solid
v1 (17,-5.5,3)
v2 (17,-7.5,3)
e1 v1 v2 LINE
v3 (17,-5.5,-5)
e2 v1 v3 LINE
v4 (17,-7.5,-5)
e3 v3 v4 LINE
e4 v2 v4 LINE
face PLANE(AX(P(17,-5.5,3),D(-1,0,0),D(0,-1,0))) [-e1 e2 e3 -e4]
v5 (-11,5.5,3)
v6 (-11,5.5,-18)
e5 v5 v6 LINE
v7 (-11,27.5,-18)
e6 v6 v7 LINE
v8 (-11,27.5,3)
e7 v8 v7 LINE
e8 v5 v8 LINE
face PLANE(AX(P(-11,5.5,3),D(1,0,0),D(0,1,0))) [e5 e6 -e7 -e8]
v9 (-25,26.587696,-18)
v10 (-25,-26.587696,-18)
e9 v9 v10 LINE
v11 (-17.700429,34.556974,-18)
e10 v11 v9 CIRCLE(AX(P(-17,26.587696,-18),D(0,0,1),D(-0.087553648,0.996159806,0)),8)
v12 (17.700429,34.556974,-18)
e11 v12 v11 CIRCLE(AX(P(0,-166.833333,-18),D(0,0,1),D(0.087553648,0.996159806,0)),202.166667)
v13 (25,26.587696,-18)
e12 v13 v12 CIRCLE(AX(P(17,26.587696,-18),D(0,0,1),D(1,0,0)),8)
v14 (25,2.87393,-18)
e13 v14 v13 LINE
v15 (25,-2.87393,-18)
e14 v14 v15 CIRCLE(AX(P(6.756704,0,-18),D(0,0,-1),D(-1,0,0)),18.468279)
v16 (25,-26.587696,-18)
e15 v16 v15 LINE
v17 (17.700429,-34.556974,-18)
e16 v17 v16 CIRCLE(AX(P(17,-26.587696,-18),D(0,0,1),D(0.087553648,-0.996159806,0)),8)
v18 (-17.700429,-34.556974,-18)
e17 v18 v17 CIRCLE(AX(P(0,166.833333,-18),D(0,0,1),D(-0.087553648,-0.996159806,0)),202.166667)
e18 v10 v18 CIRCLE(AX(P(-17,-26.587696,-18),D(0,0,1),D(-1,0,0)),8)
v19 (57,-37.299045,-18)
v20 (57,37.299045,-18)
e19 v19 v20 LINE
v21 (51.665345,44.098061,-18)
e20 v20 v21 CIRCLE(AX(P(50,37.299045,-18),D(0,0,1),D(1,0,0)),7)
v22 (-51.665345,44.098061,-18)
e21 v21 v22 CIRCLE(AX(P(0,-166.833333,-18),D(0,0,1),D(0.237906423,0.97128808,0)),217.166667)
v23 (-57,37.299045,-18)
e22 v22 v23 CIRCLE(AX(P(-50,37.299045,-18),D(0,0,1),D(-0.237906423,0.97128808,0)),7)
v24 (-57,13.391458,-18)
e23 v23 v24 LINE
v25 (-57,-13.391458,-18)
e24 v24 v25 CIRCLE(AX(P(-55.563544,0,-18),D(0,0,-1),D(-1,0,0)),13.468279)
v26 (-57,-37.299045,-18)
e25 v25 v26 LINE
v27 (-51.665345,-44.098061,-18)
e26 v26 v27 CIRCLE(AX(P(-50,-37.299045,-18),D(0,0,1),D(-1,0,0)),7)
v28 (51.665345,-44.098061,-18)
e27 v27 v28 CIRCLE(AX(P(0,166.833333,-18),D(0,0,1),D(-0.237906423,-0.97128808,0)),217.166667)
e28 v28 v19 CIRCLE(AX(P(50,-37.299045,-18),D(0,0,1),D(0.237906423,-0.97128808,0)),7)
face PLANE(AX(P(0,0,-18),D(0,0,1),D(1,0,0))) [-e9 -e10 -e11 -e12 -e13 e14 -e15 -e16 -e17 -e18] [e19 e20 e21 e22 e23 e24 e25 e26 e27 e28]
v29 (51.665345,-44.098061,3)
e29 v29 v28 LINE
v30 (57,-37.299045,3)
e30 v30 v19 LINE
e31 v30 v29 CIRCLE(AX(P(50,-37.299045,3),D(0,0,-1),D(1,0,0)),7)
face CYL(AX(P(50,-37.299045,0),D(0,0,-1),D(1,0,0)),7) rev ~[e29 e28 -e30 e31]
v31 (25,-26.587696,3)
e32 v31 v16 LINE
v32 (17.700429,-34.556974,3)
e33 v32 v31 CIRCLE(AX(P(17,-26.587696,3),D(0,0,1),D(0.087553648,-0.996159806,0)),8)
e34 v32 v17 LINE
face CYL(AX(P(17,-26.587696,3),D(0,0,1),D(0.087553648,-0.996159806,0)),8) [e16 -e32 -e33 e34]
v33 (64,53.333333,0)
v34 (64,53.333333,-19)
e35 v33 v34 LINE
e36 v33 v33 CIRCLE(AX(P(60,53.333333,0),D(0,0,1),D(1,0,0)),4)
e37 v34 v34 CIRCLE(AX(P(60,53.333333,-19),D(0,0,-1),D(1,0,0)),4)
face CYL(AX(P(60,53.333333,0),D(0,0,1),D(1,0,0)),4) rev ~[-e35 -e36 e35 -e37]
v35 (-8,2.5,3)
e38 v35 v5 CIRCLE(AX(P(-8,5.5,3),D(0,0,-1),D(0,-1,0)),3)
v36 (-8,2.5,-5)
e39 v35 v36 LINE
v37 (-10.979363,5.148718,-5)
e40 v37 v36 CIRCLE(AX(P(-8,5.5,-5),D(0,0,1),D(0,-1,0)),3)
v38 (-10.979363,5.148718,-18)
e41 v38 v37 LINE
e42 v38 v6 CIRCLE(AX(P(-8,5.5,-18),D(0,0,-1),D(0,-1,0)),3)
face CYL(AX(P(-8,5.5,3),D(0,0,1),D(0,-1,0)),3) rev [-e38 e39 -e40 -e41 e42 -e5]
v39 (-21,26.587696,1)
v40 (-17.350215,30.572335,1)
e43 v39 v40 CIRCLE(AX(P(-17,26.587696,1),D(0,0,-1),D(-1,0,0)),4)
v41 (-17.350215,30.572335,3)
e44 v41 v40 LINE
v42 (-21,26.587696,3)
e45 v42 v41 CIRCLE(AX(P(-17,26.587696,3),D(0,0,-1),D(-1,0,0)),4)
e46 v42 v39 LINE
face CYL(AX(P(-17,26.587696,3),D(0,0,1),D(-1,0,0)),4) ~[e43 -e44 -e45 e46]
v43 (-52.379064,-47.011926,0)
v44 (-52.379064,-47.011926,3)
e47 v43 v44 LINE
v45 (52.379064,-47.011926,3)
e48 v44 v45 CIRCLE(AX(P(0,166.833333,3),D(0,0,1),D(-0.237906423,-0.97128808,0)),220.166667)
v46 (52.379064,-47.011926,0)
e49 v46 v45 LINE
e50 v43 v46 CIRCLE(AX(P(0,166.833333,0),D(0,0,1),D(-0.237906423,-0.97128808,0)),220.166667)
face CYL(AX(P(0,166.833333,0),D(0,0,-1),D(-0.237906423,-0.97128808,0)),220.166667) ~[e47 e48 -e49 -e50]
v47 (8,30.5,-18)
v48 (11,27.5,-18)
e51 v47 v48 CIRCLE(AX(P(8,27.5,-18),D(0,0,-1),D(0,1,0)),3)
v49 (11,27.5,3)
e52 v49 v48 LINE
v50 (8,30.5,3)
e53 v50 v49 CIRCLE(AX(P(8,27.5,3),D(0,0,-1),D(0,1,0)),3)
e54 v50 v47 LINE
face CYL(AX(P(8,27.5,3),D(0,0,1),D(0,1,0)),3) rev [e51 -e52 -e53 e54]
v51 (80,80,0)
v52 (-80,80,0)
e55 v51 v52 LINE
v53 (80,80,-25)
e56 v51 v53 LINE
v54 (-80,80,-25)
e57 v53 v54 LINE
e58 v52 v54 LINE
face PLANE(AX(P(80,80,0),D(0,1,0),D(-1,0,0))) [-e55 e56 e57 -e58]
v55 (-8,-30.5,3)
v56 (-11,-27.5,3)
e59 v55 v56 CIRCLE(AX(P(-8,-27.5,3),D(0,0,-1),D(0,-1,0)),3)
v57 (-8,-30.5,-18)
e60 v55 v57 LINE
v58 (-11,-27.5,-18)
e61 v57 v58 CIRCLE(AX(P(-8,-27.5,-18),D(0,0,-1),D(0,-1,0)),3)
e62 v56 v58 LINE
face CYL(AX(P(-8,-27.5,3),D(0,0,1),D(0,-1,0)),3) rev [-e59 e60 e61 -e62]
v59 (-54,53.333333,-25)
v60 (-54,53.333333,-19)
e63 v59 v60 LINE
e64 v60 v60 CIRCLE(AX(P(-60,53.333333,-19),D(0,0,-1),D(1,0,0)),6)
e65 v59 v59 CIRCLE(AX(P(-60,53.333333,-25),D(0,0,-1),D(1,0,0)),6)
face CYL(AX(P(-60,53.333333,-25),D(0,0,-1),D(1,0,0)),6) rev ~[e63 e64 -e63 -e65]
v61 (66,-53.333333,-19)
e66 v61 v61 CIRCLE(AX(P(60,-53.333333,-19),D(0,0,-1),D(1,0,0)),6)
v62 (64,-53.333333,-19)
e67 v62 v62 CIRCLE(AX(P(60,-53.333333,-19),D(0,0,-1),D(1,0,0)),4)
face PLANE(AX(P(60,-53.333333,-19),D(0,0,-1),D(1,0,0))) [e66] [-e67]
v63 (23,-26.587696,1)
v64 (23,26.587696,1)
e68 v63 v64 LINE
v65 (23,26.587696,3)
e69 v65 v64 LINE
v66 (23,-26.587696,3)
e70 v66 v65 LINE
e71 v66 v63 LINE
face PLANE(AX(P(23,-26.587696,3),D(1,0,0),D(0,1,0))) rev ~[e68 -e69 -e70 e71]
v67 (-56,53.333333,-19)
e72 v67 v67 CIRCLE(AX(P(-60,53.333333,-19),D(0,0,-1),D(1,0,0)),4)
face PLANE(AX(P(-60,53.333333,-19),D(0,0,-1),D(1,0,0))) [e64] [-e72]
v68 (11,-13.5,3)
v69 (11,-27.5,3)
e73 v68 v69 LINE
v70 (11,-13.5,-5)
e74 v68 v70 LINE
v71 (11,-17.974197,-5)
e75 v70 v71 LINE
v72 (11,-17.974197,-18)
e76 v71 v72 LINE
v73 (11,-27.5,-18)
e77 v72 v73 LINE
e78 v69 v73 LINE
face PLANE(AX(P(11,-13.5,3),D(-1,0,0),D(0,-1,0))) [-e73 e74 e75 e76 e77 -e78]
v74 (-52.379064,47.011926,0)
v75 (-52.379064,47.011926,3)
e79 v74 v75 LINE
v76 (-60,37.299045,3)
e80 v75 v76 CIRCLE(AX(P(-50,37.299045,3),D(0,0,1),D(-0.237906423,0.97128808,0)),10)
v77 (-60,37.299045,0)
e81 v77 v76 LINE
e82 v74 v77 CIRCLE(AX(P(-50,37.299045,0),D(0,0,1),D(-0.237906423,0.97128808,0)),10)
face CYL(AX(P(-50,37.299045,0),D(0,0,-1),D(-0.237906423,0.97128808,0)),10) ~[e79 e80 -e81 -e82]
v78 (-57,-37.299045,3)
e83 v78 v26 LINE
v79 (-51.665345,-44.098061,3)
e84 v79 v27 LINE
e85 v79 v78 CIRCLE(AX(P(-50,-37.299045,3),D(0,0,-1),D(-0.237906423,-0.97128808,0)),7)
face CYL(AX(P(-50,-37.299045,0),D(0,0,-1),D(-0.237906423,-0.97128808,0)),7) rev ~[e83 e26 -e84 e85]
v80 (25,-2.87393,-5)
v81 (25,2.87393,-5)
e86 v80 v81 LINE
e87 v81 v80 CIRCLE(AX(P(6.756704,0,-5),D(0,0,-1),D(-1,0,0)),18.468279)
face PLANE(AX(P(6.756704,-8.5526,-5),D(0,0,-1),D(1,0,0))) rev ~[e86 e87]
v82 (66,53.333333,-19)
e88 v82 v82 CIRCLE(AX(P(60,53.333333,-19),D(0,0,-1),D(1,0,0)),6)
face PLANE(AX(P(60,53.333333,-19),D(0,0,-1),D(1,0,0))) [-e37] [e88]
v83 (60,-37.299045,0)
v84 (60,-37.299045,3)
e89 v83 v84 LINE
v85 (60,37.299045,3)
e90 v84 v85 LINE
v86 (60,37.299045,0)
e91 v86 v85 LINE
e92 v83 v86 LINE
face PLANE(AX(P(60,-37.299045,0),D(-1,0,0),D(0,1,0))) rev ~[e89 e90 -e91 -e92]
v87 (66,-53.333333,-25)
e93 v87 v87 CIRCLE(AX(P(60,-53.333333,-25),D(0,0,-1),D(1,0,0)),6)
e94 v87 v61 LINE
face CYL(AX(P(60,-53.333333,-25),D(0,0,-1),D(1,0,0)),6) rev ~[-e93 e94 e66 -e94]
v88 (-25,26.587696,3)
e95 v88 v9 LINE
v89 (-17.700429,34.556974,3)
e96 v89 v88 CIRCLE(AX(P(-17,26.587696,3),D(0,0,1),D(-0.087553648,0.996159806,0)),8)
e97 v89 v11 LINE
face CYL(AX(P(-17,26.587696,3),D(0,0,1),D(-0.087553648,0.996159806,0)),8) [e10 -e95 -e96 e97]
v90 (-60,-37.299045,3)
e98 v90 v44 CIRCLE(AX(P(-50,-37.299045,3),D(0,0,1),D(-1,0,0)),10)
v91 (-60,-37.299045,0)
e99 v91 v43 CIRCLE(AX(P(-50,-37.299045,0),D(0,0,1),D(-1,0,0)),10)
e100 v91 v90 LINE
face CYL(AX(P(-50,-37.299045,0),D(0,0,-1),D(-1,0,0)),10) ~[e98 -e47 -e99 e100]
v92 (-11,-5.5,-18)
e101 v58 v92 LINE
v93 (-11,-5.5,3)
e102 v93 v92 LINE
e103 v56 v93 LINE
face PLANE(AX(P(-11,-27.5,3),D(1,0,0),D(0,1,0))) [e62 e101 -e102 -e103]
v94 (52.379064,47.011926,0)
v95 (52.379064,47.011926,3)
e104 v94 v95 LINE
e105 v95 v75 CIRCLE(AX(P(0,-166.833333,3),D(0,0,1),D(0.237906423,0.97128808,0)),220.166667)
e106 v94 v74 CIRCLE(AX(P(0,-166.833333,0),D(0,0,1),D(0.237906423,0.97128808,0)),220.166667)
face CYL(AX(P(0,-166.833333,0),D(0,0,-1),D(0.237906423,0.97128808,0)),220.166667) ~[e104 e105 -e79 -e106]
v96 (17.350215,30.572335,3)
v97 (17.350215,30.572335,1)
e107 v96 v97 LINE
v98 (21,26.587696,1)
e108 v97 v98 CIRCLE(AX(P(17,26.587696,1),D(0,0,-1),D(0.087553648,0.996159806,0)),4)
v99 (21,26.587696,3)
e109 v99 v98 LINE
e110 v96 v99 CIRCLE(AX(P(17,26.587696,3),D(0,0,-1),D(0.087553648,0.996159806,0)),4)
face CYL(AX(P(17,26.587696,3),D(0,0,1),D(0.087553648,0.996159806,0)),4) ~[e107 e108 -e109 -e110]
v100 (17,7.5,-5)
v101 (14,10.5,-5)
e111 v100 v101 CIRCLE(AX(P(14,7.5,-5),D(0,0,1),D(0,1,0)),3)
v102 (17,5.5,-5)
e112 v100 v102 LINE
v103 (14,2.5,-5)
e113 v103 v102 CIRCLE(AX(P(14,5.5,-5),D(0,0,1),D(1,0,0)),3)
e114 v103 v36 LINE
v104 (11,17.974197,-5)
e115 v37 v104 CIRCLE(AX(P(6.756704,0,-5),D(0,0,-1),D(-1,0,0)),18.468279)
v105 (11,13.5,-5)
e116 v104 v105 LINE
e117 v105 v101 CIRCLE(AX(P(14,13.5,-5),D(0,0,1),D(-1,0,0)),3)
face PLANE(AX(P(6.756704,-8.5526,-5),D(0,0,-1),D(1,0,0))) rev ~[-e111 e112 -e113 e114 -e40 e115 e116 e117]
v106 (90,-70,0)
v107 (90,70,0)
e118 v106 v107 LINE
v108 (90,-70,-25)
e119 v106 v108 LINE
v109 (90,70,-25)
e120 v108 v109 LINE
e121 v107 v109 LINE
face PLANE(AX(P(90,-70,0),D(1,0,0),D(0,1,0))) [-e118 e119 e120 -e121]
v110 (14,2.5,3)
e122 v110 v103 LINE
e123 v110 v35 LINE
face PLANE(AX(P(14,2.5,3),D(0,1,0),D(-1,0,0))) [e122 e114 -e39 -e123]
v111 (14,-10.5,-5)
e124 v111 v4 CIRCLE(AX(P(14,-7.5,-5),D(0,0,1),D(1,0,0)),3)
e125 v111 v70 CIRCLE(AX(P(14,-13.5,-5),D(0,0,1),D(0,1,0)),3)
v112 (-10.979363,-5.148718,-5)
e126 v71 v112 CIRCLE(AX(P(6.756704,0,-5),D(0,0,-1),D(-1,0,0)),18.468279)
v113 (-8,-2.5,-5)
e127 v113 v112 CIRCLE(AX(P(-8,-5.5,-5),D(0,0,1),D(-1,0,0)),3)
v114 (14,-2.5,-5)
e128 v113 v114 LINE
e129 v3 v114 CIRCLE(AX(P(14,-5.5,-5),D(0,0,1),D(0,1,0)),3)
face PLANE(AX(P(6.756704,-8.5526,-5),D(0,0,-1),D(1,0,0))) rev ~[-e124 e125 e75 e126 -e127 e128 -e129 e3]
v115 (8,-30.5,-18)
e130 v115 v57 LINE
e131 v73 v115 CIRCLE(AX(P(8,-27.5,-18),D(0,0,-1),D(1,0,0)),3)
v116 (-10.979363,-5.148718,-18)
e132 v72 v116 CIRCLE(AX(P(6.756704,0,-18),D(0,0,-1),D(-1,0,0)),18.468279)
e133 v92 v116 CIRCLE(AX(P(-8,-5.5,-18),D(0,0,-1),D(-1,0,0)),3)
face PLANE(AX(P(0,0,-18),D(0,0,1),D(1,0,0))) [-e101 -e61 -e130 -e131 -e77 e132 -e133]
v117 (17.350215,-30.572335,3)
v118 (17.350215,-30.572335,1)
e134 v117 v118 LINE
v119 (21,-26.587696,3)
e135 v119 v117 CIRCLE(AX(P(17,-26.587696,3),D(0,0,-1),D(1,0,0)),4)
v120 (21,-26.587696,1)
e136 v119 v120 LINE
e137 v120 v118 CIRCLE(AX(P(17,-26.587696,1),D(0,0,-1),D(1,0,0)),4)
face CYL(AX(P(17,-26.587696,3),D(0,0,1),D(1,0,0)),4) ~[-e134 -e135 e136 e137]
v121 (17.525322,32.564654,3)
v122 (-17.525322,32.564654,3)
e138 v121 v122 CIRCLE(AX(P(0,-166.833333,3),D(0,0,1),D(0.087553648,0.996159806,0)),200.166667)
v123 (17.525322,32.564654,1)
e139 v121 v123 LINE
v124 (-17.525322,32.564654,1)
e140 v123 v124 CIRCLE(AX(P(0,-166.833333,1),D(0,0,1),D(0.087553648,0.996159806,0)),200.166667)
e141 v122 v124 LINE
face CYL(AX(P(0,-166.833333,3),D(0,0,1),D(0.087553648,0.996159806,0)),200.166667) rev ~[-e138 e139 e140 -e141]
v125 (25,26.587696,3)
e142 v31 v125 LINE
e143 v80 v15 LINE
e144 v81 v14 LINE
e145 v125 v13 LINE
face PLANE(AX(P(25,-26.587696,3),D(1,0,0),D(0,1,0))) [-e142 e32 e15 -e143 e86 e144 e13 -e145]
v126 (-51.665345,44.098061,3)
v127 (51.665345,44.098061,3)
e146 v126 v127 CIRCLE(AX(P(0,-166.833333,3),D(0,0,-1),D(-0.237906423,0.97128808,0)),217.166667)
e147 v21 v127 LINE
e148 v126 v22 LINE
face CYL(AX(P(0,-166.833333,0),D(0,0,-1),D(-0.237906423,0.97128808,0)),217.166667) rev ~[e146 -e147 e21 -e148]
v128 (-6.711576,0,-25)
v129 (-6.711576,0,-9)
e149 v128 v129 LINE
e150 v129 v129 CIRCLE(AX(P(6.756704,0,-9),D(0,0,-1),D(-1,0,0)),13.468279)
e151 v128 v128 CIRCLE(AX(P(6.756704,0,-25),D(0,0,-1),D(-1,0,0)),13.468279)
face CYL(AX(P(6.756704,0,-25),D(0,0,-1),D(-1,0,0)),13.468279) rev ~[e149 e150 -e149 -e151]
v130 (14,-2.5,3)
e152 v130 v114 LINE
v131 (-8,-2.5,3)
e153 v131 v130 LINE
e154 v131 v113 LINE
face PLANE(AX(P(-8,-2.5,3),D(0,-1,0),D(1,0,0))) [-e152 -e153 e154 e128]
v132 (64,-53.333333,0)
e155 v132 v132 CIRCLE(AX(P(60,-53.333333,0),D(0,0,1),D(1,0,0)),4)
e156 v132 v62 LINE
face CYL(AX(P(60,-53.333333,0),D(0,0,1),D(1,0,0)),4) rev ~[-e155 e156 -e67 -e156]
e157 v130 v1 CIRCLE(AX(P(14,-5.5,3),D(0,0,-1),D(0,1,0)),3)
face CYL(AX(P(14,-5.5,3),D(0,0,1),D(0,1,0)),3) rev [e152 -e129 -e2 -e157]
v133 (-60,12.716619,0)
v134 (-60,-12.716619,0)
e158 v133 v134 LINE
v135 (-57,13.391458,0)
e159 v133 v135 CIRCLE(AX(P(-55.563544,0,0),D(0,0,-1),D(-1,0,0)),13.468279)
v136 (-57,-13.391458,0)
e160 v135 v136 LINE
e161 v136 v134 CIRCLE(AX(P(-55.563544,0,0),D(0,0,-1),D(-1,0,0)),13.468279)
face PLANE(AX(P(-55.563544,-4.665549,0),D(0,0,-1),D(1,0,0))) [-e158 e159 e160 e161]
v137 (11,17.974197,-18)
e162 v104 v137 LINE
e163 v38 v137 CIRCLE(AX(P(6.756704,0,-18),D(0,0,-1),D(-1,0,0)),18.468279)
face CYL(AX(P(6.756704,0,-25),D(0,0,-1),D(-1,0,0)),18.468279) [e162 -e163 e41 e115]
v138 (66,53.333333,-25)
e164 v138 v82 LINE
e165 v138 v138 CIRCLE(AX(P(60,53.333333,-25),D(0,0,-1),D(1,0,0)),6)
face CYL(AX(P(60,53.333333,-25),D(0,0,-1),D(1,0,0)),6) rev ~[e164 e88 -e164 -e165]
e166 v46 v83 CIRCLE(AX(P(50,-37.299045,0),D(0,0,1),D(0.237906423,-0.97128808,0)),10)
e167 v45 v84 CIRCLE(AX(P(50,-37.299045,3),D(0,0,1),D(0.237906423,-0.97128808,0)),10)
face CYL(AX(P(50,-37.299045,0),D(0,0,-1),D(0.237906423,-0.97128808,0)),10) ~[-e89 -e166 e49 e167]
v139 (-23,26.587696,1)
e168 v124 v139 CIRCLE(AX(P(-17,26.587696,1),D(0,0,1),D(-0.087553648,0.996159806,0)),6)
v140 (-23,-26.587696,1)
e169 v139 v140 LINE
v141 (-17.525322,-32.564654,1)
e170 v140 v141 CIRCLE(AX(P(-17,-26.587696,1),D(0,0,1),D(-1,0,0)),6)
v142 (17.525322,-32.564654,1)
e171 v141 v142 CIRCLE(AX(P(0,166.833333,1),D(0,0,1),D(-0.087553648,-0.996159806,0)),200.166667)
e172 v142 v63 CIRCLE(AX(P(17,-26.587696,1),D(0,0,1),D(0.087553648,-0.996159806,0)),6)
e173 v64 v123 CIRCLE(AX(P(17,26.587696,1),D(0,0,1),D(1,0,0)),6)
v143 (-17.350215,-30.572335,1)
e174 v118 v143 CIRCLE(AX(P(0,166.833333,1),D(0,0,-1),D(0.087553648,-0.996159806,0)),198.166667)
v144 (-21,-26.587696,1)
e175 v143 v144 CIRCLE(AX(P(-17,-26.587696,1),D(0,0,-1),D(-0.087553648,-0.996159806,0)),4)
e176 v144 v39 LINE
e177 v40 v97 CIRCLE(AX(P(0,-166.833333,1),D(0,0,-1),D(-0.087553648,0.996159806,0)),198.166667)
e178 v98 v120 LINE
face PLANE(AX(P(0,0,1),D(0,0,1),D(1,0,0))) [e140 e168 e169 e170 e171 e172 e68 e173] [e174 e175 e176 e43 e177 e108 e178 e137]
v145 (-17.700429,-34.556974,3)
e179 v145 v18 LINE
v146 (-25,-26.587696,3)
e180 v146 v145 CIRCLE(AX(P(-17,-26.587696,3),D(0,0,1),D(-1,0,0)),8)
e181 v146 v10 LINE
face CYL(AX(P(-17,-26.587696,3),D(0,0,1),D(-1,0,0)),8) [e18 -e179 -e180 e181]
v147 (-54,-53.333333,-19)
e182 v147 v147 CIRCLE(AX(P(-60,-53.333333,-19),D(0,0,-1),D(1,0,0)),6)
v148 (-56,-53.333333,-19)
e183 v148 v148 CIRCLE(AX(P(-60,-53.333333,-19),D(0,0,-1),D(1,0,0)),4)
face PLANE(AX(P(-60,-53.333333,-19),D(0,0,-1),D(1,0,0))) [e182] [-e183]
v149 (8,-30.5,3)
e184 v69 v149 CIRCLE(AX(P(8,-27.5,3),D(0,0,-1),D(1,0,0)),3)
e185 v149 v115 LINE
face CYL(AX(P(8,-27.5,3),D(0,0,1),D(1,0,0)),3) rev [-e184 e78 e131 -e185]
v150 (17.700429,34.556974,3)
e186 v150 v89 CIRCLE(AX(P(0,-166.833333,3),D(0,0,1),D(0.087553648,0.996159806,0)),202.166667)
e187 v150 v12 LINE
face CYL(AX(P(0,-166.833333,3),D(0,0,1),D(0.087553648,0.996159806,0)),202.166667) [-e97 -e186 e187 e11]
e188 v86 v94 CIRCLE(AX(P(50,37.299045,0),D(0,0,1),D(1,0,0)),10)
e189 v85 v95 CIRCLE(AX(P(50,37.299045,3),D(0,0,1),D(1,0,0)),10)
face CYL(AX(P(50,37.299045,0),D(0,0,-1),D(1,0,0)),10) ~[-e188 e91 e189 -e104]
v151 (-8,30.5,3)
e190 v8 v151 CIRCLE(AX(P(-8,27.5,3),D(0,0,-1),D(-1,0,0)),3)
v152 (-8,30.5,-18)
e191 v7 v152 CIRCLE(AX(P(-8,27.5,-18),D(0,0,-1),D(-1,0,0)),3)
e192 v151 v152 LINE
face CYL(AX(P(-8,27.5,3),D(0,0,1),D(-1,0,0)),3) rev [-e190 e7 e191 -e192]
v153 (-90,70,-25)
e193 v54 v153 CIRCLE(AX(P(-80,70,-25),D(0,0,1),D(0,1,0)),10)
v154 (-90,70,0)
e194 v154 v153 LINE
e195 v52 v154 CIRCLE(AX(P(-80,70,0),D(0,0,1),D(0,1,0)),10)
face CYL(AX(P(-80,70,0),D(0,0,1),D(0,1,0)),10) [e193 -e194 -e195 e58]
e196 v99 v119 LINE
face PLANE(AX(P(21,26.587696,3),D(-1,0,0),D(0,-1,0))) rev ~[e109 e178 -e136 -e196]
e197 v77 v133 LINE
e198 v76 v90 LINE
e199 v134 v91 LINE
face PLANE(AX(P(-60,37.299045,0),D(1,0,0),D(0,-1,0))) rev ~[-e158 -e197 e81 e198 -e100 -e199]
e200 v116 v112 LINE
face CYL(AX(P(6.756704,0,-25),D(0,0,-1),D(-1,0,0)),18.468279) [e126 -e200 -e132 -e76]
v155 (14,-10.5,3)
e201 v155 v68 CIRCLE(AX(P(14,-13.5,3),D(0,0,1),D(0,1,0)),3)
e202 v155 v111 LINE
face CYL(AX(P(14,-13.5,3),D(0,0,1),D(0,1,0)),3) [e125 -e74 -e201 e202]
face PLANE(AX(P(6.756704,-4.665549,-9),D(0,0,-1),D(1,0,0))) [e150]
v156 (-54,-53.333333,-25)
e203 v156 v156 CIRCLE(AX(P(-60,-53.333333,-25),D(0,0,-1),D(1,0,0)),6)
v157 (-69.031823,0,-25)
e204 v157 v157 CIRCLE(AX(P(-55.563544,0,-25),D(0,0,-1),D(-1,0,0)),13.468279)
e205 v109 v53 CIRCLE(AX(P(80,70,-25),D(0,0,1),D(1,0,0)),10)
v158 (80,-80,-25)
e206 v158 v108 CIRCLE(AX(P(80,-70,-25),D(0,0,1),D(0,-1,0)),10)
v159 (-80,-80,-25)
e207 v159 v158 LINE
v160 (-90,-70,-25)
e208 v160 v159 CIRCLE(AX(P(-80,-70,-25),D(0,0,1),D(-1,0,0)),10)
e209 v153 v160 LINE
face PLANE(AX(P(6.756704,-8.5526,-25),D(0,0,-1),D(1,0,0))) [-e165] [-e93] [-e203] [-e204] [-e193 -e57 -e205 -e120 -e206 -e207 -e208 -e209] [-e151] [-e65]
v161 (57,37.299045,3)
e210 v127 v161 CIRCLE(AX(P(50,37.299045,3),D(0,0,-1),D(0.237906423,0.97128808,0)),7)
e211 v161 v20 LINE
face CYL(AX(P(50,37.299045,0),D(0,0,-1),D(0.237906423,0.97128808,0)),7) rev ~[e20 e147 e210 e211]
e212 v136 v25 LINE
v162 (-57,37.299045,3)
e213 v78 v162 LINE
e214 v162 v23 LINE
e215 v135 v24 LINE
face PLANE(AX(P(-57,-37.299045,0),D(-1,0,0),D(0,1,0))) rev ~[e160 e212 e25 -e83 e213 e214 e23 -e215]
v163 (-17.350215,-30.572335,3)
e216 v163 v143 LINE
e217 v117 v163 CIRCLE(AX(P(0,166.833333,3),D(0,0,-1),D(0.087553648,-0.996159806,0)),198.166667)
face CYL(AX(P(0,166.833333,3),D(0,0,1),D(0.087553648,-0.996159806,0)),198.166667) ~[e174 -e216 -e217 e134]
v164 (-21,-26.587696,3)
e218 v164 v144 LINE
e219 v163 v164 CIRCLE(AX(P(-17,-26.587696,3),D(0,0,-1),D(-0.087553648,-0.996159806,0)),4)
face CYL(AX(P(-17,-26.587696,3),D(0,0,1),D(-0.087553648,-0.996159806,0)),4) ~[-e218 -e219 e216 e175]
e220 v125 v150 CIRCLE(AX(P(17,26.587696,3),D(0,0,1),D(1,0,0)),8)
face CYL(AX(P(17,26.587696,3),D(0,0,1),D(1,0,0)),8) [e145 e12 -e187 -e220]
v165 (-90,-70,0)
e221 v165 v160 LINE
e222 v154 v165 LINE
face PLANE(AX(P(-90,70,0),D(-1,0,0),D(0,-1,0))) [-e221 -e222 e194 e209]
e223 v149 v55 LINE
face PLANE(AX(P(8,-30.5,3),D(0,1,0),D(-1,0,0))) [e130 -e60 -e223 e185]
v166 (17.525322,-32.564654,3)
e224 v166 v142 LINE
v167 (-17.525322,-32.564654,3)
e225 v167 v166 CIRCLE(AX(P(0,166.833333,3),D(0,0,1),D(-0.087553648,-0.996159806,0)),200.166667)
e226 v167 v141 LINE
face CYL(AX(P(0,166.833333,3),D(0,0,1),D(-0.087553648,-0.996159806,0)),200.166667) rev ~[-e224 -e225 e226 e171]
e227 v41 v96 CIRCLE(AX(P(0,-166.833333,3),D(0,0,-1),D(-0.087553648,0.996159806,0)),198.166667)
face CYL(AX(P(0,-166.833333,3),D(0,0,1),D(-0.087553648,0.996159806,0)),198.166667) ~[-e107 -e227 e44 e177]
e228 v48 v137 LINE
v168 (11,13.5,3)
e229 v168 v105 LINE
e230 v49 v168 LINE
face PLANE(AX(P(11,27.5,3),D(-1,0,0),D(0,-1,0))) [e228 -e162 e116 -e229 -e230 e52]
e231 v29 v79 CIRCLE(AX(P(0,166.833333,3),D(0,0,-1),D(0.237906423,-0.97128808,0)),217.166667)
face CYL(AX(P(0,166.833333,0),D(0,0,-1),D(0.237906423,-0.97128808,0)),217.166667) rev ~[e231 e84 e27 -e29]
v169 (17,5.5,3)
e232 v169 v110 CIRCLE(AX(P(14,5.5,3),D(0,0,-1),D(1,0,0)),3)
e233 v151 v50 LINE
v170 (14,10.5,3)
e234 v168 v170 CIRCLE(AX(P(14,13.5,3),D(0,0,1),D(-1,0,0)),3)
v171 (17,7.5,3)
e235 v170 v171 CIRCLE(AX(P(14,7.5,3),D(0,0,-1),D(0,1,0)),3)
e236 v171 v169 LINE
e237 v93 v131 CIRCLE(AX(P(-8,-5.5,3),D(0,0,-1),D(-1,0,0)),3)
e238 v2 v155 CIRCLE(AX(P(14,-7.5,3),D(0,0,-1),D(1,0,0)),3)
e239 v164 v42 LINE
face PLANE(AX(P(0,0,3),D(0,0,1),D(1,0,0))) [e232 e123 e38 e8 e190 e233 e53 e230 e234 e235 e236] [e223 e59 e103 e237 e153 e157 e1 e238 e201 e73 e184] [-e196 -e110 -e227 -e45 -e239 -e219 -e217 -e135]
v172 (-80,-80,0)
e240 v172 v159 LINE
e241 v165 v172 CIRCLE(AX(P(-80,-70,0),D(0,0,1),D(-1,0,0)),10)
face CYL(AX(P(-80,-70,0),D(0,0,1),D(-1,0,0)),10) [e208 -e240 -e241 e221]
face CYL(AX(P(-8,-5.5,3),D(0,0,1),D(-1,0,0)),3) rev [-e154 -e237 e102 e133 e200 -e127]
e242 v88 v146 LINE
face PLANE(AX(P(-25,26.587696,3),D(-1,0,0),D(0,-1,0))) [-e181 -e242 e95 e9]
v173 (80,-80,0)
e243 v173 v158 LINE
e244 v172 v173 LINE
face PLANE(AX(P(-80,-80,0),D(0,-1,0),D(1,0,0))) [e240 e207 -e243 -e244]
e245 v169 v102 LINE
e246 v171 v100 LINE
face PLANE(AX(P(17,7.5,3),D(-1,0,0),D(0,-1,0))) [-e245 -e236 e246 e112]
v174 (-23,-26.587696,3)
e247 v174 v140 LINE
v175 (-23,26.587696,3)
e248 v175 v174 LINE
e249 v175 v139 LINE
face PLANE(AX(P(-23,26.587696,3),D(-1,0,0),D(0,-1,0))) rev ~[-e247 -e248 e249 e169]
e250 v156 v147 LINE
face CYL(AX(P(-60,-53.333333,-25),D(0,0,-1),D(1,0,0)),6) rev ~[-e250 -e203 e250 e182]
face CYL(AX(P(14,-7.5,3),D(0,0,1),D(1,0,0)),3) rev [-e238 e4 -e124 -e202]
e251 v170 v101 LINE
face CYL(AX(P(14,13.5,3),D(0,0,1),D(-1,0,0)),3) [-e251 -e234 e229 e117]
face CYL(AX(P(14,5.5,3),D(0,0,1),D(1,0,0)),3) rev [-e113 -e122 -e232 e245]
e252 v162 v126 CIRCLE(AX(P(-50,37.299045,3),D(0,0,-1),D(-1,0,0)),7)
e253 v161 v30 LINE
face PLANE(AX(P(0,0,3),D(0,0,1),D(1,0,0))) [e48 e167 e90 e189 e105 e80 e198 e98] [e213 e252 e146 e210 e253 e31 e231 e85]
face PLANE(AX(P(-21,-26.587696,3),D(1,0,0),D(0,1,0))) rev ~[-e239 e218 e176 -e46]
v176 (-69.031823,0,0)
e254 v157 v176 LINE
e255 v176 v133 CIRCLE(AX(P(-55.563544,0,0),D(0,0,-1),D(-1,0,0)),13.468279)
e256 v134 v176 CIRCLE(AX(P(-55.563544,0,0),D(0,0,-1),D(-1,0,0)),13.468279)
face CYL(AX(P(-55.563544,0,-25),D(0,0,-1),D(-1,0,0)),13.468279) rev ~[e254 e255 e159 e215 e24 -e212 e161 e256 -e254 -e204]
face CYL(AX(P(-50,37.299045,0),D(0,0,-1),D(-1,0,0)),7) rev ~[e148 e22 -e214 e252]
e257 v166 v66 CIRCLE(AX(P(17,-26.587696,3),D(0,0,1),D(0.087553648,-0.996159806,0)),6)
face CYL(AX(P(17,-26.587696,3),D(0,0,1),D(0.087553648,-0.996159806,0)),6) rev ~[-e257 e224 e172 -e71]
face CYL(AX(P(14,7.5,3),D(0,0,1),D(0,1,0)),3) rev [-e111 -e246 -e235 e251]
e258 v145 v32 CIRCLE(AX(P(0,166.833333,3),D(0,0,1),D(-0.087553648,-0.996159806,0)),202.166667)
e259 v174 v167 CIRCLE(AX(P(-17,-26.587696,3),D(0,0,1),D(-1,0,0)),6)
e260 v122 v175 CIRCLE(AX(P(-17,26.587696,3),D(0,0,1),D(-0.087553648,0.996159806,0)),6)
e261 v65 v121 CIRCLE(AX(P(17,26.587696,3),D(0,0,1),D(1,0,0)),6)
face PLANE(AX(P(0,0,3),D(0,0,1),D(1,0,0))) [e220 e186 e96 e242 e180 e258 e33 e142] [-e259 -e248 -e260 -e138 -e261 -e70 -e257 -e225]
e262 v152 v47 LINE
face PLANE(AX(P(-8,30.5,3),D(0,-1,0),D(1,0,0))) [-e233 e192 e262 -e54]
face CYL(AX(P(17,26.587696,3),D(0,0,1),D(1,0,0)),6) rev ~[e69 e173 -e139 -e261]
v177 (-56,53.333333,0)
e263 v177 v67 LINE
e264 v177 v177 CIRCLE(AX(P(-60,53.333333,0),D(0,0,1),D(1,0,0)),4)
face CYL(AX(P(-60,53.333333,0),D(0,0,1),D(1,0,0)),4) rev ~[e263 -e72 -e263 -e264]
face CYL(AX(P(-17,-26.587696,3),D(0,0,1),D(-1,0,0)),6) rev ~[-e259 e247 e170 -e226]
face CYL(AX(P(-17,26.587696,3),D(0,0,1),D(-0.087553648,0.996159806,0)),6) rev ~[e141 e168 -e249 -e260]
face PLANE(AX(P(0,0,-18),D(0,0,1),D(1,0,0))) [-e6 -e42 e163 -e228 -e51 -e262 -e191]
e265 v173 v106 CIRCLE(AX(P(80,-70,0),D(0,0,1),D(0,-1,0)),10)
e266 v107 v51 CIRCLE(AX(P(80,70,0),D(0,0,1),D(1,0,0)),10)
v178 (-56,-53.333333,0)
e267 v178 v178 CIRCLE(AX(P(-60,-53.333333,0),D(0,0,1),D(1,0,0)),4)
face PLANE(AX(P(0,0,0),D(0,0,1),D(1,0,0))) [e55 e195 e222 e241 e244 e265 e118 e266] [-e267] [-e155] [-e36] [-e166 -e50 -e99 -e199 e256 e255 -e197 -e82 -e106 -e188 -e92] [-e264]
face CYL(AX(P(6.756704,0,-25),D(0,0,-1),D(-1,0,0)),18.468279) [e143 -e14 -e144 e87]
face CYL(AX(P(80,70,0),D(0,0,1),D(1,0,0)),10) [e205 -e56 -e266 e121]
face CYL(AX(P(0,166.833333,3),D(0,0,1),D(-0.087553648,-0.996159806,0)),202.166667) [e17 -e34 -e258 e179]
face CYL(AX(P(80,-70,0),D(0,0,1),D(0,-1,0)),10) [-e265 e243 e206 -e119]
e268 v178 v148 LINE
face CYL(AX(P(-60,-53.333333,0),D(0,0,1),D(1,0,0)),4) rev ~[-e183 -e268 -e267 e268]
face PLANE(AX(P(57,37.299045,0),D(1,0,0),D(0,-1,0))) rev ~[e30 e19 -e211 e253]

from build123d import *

# Parameters (mm, degrees)
F0_R      = 4
F1_DEPTH  = 25
F2_DEPTH  = 3
F3_DEPTH  = 18
F5_DEPTH  = 21
F6_DEPTH  = 2
F8_DEPTH  = 20
F9_DEPTH  = 16
F10_DEPTH = 25
F7_R      = 6
F7_R_2    = 4
F11_DEPTH = 6


# Not quite as in the source:
# - a feature of the source that left no trace in its solid (it failed there, or was rolled back) is left out


with BuildPart() as f1:
    # F0 (on Top) → F1 (new body)
    with BuildSketch(Plane.XY):
        with BuildLine():
            ThreePointArc((-90, -70), (-87.0710678119, -77.0710678119), (-80, -80))
            Line((-80, -80), (80, -80))
            ThreePointArc((80, -80), (87.0710678119, -77.0710678119), (90, -70))
            Line((90, -70), (90, 70))
            ThreePointArc((90, 70), (87.0710678119, 77.0710678119), (80, 80))
            Line((80, 80), (-80, 80))
            ThreePointArc((-80, 80), (-87.0710678119, 77.0710678119), (-90, 70))
            Line((-90, 70), (-90, -70))
        make_face()
        with Locations((-60, -53.3333333333)):
            Circle(F0_R, mode=Mode.SUBTRACT)
        with Locations((60, -53.3333333333)):
            Circle(F0_R, mode=Mode.SUBTRACT)
        with Locations((-60, 53.3333333333)):
            Circle(F0_R, mode=Mode.SUBTRACT)
        with BuildLine():
            ThreePointArc((-64, 37.2990447398), (-61.0143011354, 45.9411029726), (-53.3306899286, 50.8970778549))
            ThreePointArc((-53.3306899286, 50.8970778549), (0, 57.3333333333), (53.3306899286, 50.8970778549))
            ThreePointArc((53.3306899286, 50.8970778549), (61.0143011354, 45.9411029726), (64, 37.2990447398))
            Line((64, 37.2990447398), (64, -37.2990447398))
            ThreePointArc((64, -37.2990447398), (61.0143011354, -45.9411029726), (53.3306899286, -50.8970778549))
            ThreePointArc((53.3306899286, -50.8970778549), (0, -57.3333333333), (-53.3306899286, -50.8970778549))
            ThreePointArc((-53.3306899286, -50.8970778549), (-61.0143011354, -45.9411029726), (-64, -37.2990447398))
            Line((-64, -37.2990447398), (-64, 37.2990447398))
        make_face(mode=Mode.SUBTRACT)
        with Locations((60, 53.3333333333)):
            Circle(F0_R, mode=Mode.SUBTRACT)
        with BuildLine():
            ThreePointArc((53.3306899286, 50.8970778549), (0, 57.3333333333), (-53.3306899286, 50.8970778549))
            ThreePointArc((-53.3306899286, 50.8970778549), (-61.0143011354, 45.9411029726), (-64, 37.2990447398))
            Line((-64, 37.2990447398), (-64, -37.2990447398))
            ThreePointArc((-64, -37.2990447398), (-61.0143011354, -45.9411029726), (-53.3306899286, -50.8970778549))
            ThreePointArc((-53.3306899286, -50.8970778549), (0, -57.3333333333), (53.3306899286, -50.8970778549))
            ThreePointArc((53.3306899286, -50.8970778549), (61.0143011354, -45.9411029726), (64, -37.2990447398))
            Line((64, -37.2990447398), (64, 37.2990447398))
            ThreePointArc((64, 37.2990447398), (61.0143011354, 45.9411029726), (53.3306899286, 50.8970778549))
        make_face()
        with BuildLine():
            Line((-60, -37.2990447398), (-60, 37.2990447398))
            ThreePointArc((-60, 37.2990447398), (-57.8673579538, 43.4719434775), (-52.3790642347, 47.0119255363))
            ThreePointArc((-52.3790642347, 47.0119255363), (0, 53.3333333333), (52.3790642347, 47.0119255363))
            ThreePointArc((52.3790642347, 47.0119255363), (57.8673579538, 43.4719434775), (60, 37.2990447398))
            Line((60, 37.2990447398), (60, -37.2990447398))
            ThreePointArc((60, -37.2990447398), (57.8673579538, -43.4719434775), (52.3790642347, -47.0119255363))
            ThreePointArc((52.3790642347, -47.0119255363), (0, -53.3333333333), (-52.3790642347, -47.0119255363))
            ThreePointArc((-52.3790642347, -47.0119255363), (-57.8673579538, -43.4719434775), (-60, -37.2990447398))
        make_face(mode=Mode.SUBTRACT)
        with BuildLine():
            ThreePointArc((-52.3790642347, 47.0119255363), (-57.8673579538, 43.4719434775), (-60, 37.2990447398))
            Line((-60, 37.2990447398), (-60, -37.2990447398))
            ThreePointArc((-60, -37.2990447398), (-57.8673579538, -43.4719434775), (-52.3790642347, -47.0119255363))
            ThreePointArc((-52.3790642347, -47.0119255363), (0, -53.3333333333), (52.3790642347, -47.0119255363))
            ThreePointArc((52.3790642347, -47.0119255363), (57.8673579538, -43.4719434775), (60, -37.2990447398))
            Line((60, -37.2990447398), (60, 37.2990447398))
            ThreePointArc((60, 37.2990447398), (57.8673579538, 43.4719434775), (52.3790642347, 47.0119255363))
            ThreePointArc((52.3790642347, 47.0119255363), (0, 53.3333333333), (-52.3790642347, 47.0119255363))
        make_face()
        with BuildLine():
            ThreePointArc((51.6653449643, 44.0980612973), (55.5071505677, 41.6200738562), (57, 37.2990447398))
            Line((57, 37.2990447398), (57, -37.2990447398))
            ThreePointArc((57, -37.2990447398), (55.5071505677, -41.6200738562), (51.6653449643, -44.0980612973))
            ThreePointArc((51.6653449643, -44.0980612973), (0, -50.3333333333), (-51.6653449643, -44.0980612973))
            ThreePointArc((-51.6653449643, -44.0980612973), (-55.5071505677, -41.6200738562), (-57, -37.2990447398))
            Line((-57, -37.2990447398), (-57, 37.2990447398))
            ThreePointArc((-57, 37.2990447398), (-55.5071505677, 41.6200738562), (-51.6653449643, 44.0980612973))
            ThreePointArc((-51.6653449643, 44.0980612973), (0, 50.3333333333), (51.6653449643, 44.0980612973))
        make_face(mode=Mode.SUBTRACT)
        with BuildLine():
            Line((57, -37.2990447398), (57, 37.2990447398))
            ThreePointArc((57, 37.2990447398), (55.5071505677, 41.6200738562), (51.6653449643, 44.0980612973))
            ThreePointArc((51.6653449643, 44.0980612973), (0, 50.3333333333), (-51.6653449643, 44.0980612973))
            ThreePointArc((-51.6653449643, 44.0980612973), (-55.5071505677, 41.6200738562), (-57, 37.2990447398))
            Line((-57, 37.2990447398), (-57, -37.2990447398))
            ThreePointArc((-57, -37.2990447398), (-55.5071505677, -41.6200738562), (-51.6653449643, -44.0980612973))
            ThreePointArc((-51.6653449643, -44.0980612973), (0, -50.3333333333), (51.6653449643, -44.0980612973))
            ThreePointArc((51.6653449643, -44.0980612973), (55.5071505677, -41.6200738562), (57, -37.2990447398))
        make_face()
    extrude(amount=-F1_DEPTH)

    # F0 (on Top) → F2 (join)
    with BuildSketch(Plane.XY):
        with BuildLine():
            ThreePointArc((-52.3790642347, 47.0119255363), (-57.8673579538, 43.4719434775), (-60, 37.2990447398))
            Line((-60, 37.2990447398), (-60, -37.2990447398))
            ThreePointArc((-60, -37.2990447398), (-57.8673579538, -43.4719434775), (-52.3790642347, -47.0119255363))
            ThreePointArc((-52.3790642347, -47.0119255363), (0, -53.3333333333), (52.3790642347, -47.0119255363))
            ThreePointArc((52.3790642347, -47.0119255363), (57.8673579538, -43.4719434775), (60, -37.2990447398))
            Line((60, -37.2990447398), (60, 37.2990447398))
            ThreePointArc((60, 37.2990447398), (57.8673579538, 43.4719434775), (52.3790642347, 47.0119255363))
            ThreePointArc((52.3790642347, 47.0119255363), (0, 53.3333333333), (-52.3790642347, 47.0119255363))
        make_face()
        with BuildLine():
            ThreePointArc((51.6653449643, 44.0980612973), (55.5071505677, 41.6200738562), (57, 37.2990447398))
            Line((57, 37.2990447398), (57, -37.2990447398))
            ThreePointArc((57, -37.2990447398), (55.5071505677, -41.6200738562), (51.6653449643, -44.0980612973))
            ThreePointArc((51.6653449643, -44.0980612973), (0, -50.3333333333), (-51.6653449643, -44.0980612973))
            ThreePointArc((-51.6653449643, -44.0980612973), (-55.5071505677, -41.6200738562), (-57, -37.2990447398))
            Line((-57, -37.2990447398), (-57, 37.2990447398))
            ThreePointArc((-57, 37.2990447398), (-55.5071505677, 41.6200738562), (-51.6653449643, 44.0980612973))
            ThreePointArc((-51.6653449643, 44.0980612973), (0, 50.3333333333), (51.6653449643, 44.0980612973))
        make_face(mode=Mode.SUBTRACT)
    extrude(amount=F2_DEPTH)

    # F0 (on Top) → F3 (cut)
    with BuildSketch(Plane.XY):
        with BuildLine():
            Line((57, -37.2990447398), (57, 37.2990447398))
            ThreePointArc((57, 37.2990447398), (55.5071505677, 41.6200738562), (51.6653449643, 44.0980612973))
            ThreePointArc((51.6653449643, 44.0980612973), (0, 50.3333333333), (-51.6653449643, 44.0980612973))
            ThreePointArc((-51.6653449643, 44.0980612973), (-55.5071505677, 41.6200738562), (-57, 37.2990447398))
            Line((-57, 37.2990447398), (-57, -37.2990447398))
            ThreePointArc((-57, -37.2990447398), (-55.5071505677, -41.6200738562), (-51.6653449643, -44.0980612973))
            ThreePointArc((-51.6653449643, -44.0980612973), (0, -50.3333333333), (51.6653449643, -44.0980612973))
            ThreePointArc((51.6653449643, -44.0980612973), (55.5071505677, -41.6200738562), (57, -37.2990447398))
        make_face()
    extrude(amount=-F3_DEPTH, mode=Mode.SUBTRACT)

    # F4 (on face) → F5 (join, through all)
    with BuildSketch(Plane.XY.offset(3)):
        with BuildLine():
            ThreePointArc((-25, -26.587695628), (-22.8992979869, -31.9912392117), (-17.7004291845, -34.5569740744))
            ThreePointArc((-17.7004291845, -34.5569740744), (0, -35.3333333333), (17.7004291845, -34.5569740744))
            ThreePointArc((17.7004291845, -34.5569740744), (22.8992979869, -31.9912392117), (25, -26.587695628))
            Line((25, -26.587695628), (25, 26.587695628))
            ThreePointArc((25, 26.587695628), (22.8992979869, 31.9912392117), (17.7004291845, 34.5569740744))
            ThreePointArc((17.7004291845, 34.5569740744), (0, 35.3333333333), (-17.7004291845, 34.5569740744))
            ThreePointArc((-17.7004291845, 34.5569740744), (-22.8992979869, 31.9912392117), (-25, 26.587695628))
            Line((-25, 26.587695628), (-25, -26.587695628))
        make_face()
        with BuildLine():
            ThreePointArc((17.5253218884, 32.5646544628), (21.4244734902, 30.6403533158), (23, 26.587695628))
            Line((23, 26.587695628), (23, -26.587695628))
            ThreePointArc((23, -26.587695628), (21.4244734902, -30.6403533158), (17.5253218884, -32.5646544628))
            ThreePointArc((17.5253218884, -32.5646544628), (0, -33.3333333333), (-17.5253218884, -32.5646544628))
            ThreePointArc((-17.5253218884, -32.5646544628), (-21.4244734902, -30.6403533158), (-23, -26.587695628))
            Line((-23, -26.587695628), (-23, 26.587695628))
            ThreePointArc((-23, 26.587695628), (-21.4244734902, 30.6403533158), (-17.5253218884, 32.5646544628))
            ThreePointArc((-17.5253218884, 32.5646544628), (0, 33.3333333333), (17.5253218884, 32.5646544628))
        make_face(mode=Mode.SUBTRACT)
        with BuildLine():
            Line((23, -26.587695628), (23, 26.587695628))
            ThreePointArc((23, 26.587695628), (21.4244734902, 30.6403533158), (17.5253218884, 32.5646544628))
            ThreePointArc((17.5253218884, 32.5646544628), (0, 33.3333333333), (-17.5253218884, 32.5646544628))
            ThreePointArc((-17.5253218884, 32.5646544628), (-21.4244734902, 30.6403533158), (-23, 26.587695628))
            Line((-23, 26.587695628), (-23, -26.587695628))
            ThreePointArc((-23, -26.587695628), (-21.4244734902, -30.6403533158), (-17.5253218884, -32.5646544628))
            ThreePointArc((-17.5253218884, -32.5646544628), (0, -33.3333333333), (17.5253218884, -32.5646544628))
            ThreePointArc((17.5253218884, -32.5646544628), (21.4244734902, -30.6403533158), (23, -26.587695628))
        make_face()
        with BuildLine():
            ThreePointArc((17.3502145923, 30.5723348512), (19.9496489934, 29.2894674198), (21, 26.587695628))
            Line((21, 26.587695628), (21, -26.587695628))
            ThreePointArc((21, -26.587695628), (19.9496489934, -29.2894674198), (17.3502145923, -30.5723348512))
            ThreePointArc((17.3502145923, -30.5723348512), (0, -31.3333333333), (-17.3502145923, -30.5723348512))
            ThreePointArc((-17.3502145923, -30.5723348512), (-19.9496489934, -29.2894674198), (-21, -26.587695628))
            Line((-21, -26.587695628), (-21, 26.587695628))
            ThreePointArc((-21, 26.587695628), (-19.9496489934, 29.2894674198), (-17.3502145923, 30.5723348512))
            ThreePointArc((-17.3502145923, 30.5723348512), (0, 31.3333333333), (17.3502145923, 30.5723348512))
        make_face(mode=Mode.SUBTRACT)
        with BuildLine():
            Line((21, -26.587695628), (21, 26.587695628))
            ThreePointArc((21, 26.587695628), (19.9496489934, 29.2894674198), (17.3502145923, 30.5723348512))
            ThreePointArc((17.3502145923, 30.5723348512), (0, 31.3333333333), (-17.3502145923, 30.5723348512))
            ThreePointArc((-17.3502145923, 30.5723348512), (-19.9496489934, 29.2894674198), (-21, 26.587695628))
            Line((-21, 26.587695628), (-21, -26.587695628))
            ThreePointArc((-21, -26.587695628), (-19.9496489934, -29.2894674198), (-17.3502145923, -30.5723348512))
            ThreePointArc((-17.3502145923, -30.5723348512), (0, -31.3333333333), (17.3502145923, -30.5723348512))
            ThreePointArc((17.3502145923, -30.5723348512), (19.9496489934, -29.2894674198), (21, -26.587695628))
        make_face()
        with BuildLine():
            Line((-8, -2.5), (14, -2.5))
            ThreePointArc((14, -2.5), (16.1213203436, -3.3786796564), (17, -5.5))
            Line((17, -5.5), (17, -7.5))
            ThreePointArc((17, -7.5), (16.1213203436, -9.6213203436), (14, -10.5))
            ThreePointArc((14, -10.5), (11.8786796564, -11.3786796564), (11, -13.5))
            Line((11, -13.5), (11, -27.5))
            ThreePointArc((11, -27.5), (10.1213203436, -29.6213203436), (8, -30.5))
            Line((8, -30.5), (-8, -30.5))
            ThreePointArc((-8, -30.5), (-10.1213203436, -29.6213203436), (-11, -27.5))
            Line((-11, -27.5), (-11, -5.5))
            ThreePointArc((-11, -5.5), (-10.1213203436, -3.3786796564), (-8, -2.5))
        make_face(mode=Mode.SUBTRACT)
        with BuildLine():
            ThreePointArc((-8, 2.5), (-10.1213203436, 3.3786796564), (-11, 5.5))
            Line((-11, 5.5), (-11, 27.5))
            ThreePointArc((-11, 27.5), (-10.1213203436, 29.6213203436), (-8, 30.5))
            Line((-8, 30.5), (8, 30.5))
            ThreePointArc((8, 30.5), (10.1213203436, 29.6213203436), (11, 27.5))
            Line((11, 27.5), (11, 13.5))
            ThreePointArc((11, 13.5), (11.8786796564, 11.3786796564), (14, 10.5))
            ThreePointArc((14, 10.5), (16.1213203436, 9.6213203436), (17, 7.5))
            Line((17, 7.5), (17, 5.5))
            ThreePointArc((17, 5.5), (16.1213203436, 3.3786796564), (14, 2.5))
            Line((14, 2.5), (-8, 2.5))
        make_face(mode=Mode.SUBTRACT)
    extrude(amount=-F5_DEPTH)

    # F4 (on face) → F6 (cut)
    with BuildSketch(Plane.XY.offset(3)):
        with BuildLine():
            Line((23, -26.587695628), (23, 26.587695628))
            ThreePointArc((23, 26.587695628), (21.4244734902, 30.6403533158), (17.5253218884, 32.5646544628))
            ThreePointArc((17.5253218884, 32.5646544628), (0, 33.3333333333), (-17.5253218884, 32.5646544628))
            ThreePointArc((-17.5253218884, 32.5646544628), (-21.4244734902, 30.6403533158), (-23, 26.587695628))
            Line((-23, 26.587695628), (-23, -26.587695628))
            ThreePointArc((-23, -26.587695628), (-21.4244734902, -30.6403533158), (-17.5253218884, -32.5646544628))
            ThreePointArc((-17.5253218884, -32.5646544628), (0, -33.3333333333), (17.5253218884, -32.5646544628))
            ThreePointArc((17.5253218884, -32.5646544628), (21.4244734902, -30.6403533158), (23, -26.587695628))
        make_face()
        with BuildLine():
            ThreePointArc((17.3502145923, 30.5723348512), (19.9496489934, 29.2894674198), (21, 26.587695628))
            Line((21, 26.587695628), (21, -26.587695628))
            ThreePointArc((21, -26.587695628), (19.9496489934, -29.2894674198), (17.3502145923, -30.5723348512))
            ThreePointArc((17.3502145923, -30.5723348512), (0, -31.3333333333), (-17.3502145923, -30.5723348512))
            ThreePointArc((-17.3502145923, -30.5723348512), (-19.9496489934, -29.2894674198), (-21, -26.587695628))
            Line((-21, -26.587695628), (-21, 26.587695628))
            ThreePointArc((-21, 26.587695628), (-19.9496489934, 29.2894674198), (-17.3502145923, 30.5723348512))
            ThreePointArc((-17.3502145923, 30.5723348512), (0, 31.3333333333), (17.3502145923, 30.5723348512))
        make_face(mode=Mode.SUBTRACT)
    extrude(amount=-F6_DEPTH, mode=Mode.SUBTRACT)

    # F7 (on face) → F8 (join)
    with BuildSketch(Plane(origin=(0, 0, -25), x_dir=(1, 0, 0), z_dir=(0, 0, -1))):
        with BuildLine():
            ThreePointArc((-6.71157564, 0), (6.7567035675, 13.4682792075), (20.224982775, 0))
            Line((20.224982775, 0), (25.224982775, 0))
            ThreePointArc((25.224982775, 0), (6.7567035675, 18.4682792075), (-11.71157564, 0))
            Line((-11.71157564, 0), (-6.71157564, 0))
        make_face()
        with BuildLine():
            Line((-6.71157564, 0), (20.224982775, 0))
            ThreePointArc((20.224982775, 0), (6.7567035675, 13.4682792075), (-6.71157564, 0))
        make_face()
        with BuildLine():
            ThreePointArc((-6.71157564, 0), (6.7567035675, -13.4682792075), (20.224982775, 0))
            Line((20.224982775, 0), (-6.71157564, 0))
        make_face()
        with BuildLine():
            Line((25.224982775, 0), (20.224982775, 0))
            ThreePointArc((20.224982775, 0), (6.7567035675, -13.4682792075), (-6.71157564, 0))
            Line((-6.71157564, 0), (-11.71157564, 0))
            ThreePointArc((-11.71157564, 0), (6.7567035675, -18.4682792075), (25.224982775, 0))
        make_face()
    extrude(amount=-F8_DEPTH)

    # F7 (on face) → F9 (cut)
    with BuildSketch(Plane(origin=(0, 0, -25), x_dir=(1, 0, 0), z_dir=(0, 0, -1))):
        with BuildLine():
            Line((-6.71157564, 0), (20.224982775, 0))
            ThreePointArc((20.224982775, 0), (6.7567035675, 13.4682792075), (-6.71157564, 0))
        make_face()
        with BuildLine():
            ThreePointArc((-6.71157564, 0), (6.7567035675, -13.4682792075), (20.224982775, 0))
            Line((20.224982775, 0), (-6.71157564, 0))
        make_face()
    extrude(amount=-F9_DEPTH, mode=Mode.SUBTRACT)

    # F7 (on face) → F10 (cut)
    with BuildSketch(Plane(origin=(0, 0, -25), x_dir=(1, 0, 0), z_dir=(0, 0, -1))):
        with BuildLine():
            Line((-69.0318229325, 0), (-42.0952645175, 0))
            ThreePointArc((-42.0952645175, 0), (-55.563543725, 13.4682792075), (-69.0318229325, 0))
        make_face()
        with BuildLine():
            ThreePointArc((-69.0318229325, 0), (-55.563543725, -13.4682792075), (-42.0952645175, 0))
            Line((-42.0952645175, 0), (-69.0318229325, 0))
        make_face()
    extrude(amount=-F10_DEPTH, mode=Mode.SUBTRACT)

    # F7 (on face) → F11 (cut)
    with BuildSketch(Plane(origin=(0, 0, -25), x_dir=(1, 0, 0), z_dir=(0, 0, -1))):
        with Locations((60, -53.3333333333)):
            Circle(F7_R)
        with Locations((60, -53.3333333333)):
            Circle(F7_R_2, mode=Mode.SUBTRACT)
        with Locations((-60, -53.3333333333)):
            Circle(F7_R)
        with Locations((-60, -53.3333333333)):
            Circle(F7_R_2, mode=Mode.SUBTRACT)
        with Locations((-60, 53.3333333333)):
            Circle(F7_R)
        with Locations((-60, 53.3333333333)):
            Circle(F7_R_2, mode=Mode.SUBTRACT)
        with Locations((60, 53.3333333333)):
            Circle(F7_R)
        with Locations((60, 53.3333333333)):
            Circle(F7_R_2, mode=Mode.SUBTRACT)
    extrude(amount=-F11_DEPTH, mode=Mode.SUBTRACT)


solid = f1.part
